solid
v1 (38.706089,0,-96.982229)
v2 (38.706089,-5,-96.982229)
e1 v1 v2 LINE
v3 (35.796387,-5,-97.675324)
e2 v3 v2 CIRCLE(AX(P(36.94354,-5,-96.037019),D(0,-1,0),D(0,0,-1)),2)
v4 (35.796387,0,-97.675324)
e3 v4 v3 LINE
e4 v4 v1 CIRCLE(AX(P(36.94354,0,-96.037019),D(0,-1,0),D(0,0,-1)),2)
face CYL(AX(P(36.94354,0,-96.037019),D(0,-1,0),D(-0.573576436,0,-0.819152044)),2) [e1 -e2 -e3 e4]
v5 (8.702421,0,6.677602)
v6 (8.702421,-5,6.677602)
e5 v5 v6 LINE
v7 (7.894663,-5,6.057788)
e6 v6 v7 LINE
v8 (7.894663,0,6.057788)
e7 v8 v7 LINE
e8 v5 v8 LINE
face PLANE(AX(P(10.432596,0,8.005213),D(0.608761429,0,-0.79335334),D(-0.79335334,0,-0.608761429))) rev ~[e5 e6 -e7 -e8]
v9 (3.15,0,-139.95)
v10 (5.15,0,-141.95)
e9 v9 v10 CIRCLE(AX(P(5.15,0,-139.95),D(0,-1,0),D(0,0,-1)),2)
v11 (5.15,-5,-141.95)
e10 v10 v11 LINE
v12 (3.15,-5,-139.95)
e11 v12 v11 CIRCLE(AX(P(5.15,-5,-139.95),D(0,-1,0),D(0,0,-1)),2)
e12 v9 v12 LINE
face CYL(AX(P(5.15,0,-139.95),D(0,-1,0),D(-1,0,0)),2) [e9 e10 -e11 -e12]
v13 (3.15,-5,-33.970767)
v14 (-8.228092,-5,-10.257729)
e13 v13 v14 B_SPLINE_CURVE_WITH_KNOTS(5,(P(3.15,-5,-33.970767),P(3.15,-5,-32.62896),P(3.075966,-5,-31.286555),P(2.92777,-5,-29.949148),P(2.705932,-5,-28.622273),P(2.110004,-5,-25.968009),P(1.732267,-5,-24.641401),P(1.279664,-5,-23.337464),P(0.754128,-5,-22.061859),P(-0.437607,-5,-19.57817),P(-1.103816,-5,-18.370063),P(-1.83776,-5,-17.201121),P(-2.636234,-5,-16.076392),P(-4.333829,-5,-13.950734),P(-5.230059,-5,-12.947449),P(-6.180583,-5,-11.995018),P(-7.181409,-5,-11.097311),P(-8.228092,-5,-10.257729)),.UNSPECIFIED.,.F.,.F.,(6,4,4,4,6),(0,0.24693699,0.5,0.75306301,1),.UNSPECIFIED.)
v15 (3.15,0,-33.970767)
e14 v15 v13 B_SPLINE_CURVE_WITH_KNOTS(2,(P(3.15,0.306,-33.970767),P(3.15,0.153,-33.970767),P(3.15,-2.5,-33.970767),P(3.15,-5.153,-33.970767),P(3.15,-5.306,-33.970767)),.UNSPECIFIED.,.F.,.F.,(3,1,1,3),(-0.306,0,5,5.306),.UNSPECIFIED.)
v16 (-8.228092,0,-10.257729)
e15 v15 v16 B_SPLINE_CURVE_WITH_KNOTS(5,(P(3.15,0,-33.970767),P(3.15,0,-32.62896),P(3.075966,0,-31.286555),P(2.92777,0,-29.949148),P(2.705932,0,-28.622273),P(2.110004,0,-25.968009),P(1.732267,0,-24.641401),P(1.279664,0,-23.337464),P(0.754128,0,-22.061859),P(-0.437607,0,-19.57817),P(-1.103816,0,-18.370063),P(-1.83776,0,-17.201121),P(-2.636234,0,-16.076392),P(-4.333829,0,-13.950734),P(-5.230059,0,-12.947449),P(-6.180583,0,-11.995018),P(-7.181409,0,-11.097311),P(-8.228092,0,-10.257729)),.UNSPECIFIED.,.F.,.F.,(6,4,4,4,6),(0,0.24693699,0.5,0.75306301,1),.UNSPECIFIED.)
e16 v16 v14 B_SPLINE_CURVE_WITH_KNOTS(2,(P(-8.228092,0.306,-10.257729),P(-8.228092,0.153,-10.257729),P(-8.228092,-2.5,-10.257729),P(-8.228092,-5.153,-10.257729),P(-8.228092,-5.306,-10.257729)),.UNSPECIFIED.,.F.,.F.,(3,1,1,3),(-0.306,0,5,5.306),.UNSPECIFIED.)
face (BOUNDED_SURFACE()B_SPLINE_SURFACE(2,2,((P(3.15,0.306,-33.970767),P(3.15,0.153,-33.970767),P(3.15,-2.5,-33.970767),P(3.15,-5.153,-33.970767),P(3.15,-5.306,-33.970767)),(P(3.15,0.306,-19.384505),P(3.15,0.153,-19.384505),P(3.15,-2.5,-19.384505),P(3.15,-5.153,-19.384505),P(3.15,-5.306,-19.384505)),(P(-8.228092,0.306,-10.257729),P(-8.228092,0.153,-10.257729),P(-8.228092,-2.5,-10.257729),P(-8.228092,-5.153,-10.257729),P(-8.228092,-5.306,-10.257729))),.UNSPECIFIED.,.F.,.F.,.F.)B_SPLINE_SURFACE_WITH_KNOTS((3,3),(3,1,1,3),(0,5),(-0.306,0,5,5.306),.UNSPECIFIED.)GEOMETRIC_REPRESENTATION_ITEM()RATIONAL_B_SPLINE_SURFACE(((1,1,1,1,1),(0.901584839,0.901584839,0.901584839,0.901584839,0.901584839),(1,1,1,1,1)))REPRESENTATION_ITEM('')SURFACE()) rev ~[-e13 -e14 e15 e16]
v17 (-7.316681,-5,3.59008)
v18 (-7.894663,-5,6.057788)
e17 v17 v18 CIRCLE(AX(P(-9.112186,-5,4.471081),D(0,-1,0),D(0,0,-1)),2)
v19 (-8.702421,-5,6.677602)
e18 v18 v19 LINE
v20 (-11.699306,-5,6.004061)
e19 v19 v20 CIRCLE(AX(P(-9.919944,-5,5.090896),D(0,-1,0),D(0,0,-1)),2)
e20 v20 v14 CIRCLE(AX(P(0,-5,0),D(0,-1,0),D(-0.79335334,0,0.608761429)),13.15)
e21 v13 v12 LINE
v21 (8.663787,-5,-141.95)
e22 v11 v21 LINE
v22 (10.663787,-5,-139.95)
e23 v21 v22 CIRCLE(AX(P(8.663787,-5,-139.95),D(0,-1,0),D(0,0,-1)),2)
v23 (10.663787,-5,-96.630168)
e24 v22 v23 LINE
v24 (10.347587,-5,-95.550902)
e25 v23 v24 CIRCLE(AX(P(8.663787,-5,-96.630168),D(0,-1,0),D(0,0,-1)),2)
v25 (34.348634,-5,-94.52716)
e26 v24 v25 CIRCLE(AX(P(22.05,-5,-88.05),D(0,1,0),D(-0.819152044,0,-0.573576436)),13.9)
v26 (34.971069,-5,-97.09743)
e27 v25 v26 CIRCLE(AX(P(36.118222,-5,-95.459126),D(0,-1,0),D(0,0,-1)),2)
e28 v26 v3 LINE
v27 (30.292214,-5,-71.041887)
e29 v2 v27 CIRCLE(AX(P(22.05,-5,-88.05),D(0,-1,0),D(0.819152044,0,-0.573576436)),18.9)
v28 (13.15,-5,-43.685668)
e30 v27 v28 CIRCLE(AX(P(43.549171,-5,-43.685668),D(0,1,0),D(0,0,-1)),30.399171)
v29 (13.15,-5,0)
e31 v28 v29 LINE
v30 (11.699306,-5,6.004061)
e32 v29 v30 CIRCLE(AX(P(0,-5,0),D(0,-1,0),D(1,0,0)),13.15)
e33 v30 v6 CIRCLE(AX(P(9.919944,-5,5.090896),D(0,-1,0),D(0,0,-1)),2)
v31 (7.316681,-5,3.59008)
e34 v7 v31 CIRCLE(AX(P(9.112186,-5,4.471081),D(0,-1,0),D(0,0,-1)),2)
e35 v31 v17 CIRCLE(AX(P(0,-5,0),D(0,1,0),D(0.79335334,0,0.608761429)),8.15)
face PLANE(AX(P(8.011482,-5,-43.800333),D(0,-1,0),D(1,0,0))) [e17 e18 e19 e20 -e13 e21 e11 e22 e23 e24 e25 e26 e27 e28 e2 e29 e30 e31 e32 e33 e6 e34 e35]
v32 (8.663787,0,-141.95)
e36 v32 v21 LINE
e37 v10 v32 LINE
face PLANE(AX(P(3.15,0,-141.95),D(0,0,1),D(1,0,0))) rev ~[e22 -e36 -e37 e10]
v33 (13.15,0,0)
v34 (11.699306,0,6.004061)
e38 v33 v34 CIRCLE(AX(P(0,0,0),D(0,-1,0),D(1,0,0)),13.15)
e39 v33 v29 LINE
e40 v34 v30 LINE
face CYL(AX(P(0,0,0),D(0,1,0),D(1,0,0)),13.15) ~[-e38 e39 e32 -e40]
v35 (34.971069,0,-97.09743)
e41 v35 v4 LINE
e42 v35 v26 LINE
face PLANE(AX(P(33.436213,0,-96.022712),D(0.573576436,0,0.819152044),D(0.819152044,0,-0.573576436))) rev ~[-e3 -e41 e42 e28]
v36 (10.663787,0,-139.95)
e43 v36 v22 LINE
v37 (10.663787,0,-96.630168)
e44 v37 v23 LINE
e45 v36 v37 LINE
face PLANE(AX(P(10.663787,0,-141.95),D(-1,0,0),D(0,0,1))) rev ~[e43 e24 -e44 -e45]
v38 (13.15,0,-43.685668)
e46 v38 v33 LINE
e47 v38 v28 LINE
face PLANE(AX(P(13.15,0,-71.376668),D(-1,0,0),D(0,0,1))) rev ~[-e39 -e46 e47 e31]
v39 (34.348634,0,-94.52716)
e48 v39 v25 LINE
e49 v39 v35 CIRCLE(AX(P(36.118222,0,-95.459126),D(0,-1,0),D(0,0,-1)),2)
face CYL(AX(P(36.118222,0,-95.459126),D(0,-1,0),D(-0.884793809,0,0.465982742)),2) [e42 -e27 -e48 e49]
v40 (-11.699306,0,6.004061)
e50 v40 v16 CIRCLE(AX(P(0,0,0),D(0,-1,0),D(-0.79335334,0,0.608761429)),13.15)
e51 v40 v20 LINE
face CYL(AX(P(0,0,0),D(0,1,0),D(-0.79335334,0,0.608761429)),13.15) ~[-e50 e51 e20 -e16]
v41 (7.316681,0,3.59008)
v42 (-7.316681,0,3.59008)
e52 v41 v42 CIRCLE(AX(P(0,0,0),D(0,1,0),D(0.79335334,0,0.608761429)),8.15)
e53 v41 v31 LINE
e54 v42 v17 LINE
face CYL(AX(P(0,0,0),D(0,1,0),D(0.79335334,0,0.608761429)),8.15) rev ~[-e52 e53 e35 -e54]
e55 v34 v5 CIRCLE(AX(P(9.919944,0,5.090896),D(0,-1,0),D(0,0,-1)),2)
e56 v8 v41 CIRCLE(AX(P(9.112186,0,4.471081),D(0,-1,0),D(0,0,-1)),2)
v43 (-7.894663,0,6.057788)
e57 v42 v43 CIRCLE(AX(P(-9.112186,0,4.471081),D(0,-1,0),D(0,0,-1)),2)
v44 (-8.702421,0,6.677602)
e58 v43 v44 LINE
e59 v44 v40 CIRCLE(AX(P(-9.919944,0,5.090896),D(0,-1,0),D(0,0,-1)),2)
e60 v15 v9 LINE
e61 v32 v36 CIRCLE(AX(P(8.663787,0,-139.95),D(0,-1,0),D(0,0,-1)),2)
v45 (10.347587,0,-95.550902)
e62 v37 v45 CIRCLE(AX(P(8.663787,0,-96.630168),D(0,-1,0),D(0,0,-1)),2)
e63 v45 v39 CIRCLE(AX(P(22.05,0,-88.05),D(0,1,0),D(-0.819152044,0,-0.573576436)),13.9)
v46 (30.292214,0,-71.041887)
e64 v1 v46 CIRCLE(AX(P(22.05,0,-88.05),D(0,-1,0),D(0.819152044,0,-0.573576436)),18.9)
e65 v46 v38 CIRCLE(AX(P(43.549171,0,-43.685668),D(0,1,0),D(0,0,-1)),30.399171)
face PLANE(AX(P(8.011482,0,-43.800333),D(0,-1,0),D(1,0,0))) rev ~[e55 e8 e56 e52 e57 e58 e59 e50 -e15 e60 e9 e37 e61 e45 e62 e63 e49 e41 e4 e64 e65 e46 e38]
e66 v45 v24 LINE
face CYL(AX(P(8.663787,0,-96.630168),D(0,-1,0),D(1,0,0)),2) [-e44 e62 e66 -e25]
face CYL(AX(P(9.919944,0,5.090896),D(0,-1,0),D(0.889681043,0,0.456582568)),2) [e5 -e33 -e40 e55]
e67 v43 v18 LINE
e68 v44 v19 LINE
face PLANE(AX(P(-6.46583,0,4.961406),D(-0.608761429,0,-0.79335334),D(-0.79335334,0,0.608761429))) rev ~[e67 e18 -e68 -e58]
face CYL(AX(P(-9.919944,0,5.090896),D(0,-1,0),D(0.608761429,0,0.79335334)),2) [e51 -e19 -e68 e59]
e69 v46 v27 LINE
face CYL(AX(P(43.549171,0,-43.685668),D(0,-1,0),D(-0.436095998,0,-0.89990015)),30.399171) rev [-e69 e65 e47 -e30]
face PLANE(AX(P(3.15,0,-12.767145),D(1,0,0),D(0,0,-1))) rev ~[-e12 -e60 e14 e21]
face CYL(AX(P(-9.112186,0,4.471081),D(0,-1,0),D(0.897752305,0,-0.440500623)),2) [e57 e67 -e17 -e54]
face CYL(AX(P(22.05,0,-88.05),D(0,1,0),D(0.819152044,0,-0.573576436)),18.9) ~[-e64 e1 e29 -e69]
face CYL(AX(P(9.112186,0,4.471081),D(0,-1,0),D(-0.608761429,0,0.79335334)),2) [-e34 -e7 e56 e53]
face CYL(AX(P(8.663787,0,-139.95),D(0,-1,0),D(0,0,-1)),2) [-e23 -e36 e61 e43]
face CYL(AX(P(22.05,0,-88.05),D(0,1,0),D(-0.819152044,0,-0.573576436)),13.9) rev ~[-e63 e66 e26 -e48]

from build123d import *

# Parameters (mm, degrees)
F1_DEPTH = 5
F2_R     = 2
F3_R     = 30.3991713246


with BuildPart() as f1:
    # F0 (on Front) → F1 (new body)
    with BuildSketch(Plane.XZ):
        with BuildLine():
            ThreePointArc((8.4325112108, -10.0903545369), (5.9438997073, -11.7299853482), (3.15, -12.7671453348))
            Line((3.15, -12.7671453348), (3.15, -88.05))
            ThreePointArc((3.15, -88.05), (3.6076950345, -83.915826859), (4.9586124402, -79.9818855189))
            ThreePointArc((4.9586124402, -79.9818855189), (8.3605698088, -75.0189025389), (13.15, -71.3766679995))
            Line((13.15, -71.3766679995), (13.15, 0))
            ThreePointArc((13.15, 0), (11.91238898, -5.569334681), (8.4325112108, -10.0903545369))
        make_face()
        with BuildLine():
            ThreePointArc((4.9586124402, -79.9818855189), (3.6076950345, -83.915826859), (3.15, -88.05))
            ThreePointArc((3.15, -88.05), (4.0247496309, -93.7333396106), (6.5680263629, -98.890594647))
            Line((6.5680263629, -98.890594647), (10.6637865844, -96.0227124653))
            ThreePointArc((10.6637865844, -96.0227124653), (22.05, -74.15), (33.4362134156, -96.0227124653))
            Line((33.4362134156, -96.0227124653), (37.5319736371, -98.890594647))
            ThreePointArc((37.5319736371, -98.890594647), (36.1951275757, -75.5150342694), (13.15, -71.3766679995))
            ThreePointArc((13.15, -71.3766679995), (8.3605698088, -75.0189025389), (4.9586124402, -79.9818855189))
        make_face()
        with BuildLine():
            ThreePointArc((6.5680263629, -98.890594647), (4.0247496309, -93.7333396106), (3.15, -88.05))
            Line((3.15, -88.05), (3.15, -141.95))
            Line((3.15, -141.95), (10.6637865844, -141.95))
            Line((10.6637865844, -141.95), (10.6637865844, -103.1352293338))
            ThreePointArc((10.6637865844, -103.1352293338), (8.4492978203, -101.1736770845), (6.5680263629, -98.890594647))
        make_face()
        with BuildLine():
            Line((10.6637865844, -96.0227124653), (6.5680263629, -98.890594647))
            ThreePointArc((6.5680263629, -98.890594647), (8.4492978203, -101.1736770845), (10.6637865844, -103.1352293338))
            Line((10.6637865844, -103.1352293338), (10.6637865844, -96.0227124653))
        make_face()
        with BuildLine():
            ThreePointArc((-10.4325964248, 8.0052127915), (-12.666067706, -3.5345761935), (-4.7800799709, -12.2504422562))
            ThreePointArc((-4.7800799709, -12.2504422562), (-0.8550062548, -13.1221745265), (3.15, -12.7671453348))
            ThreePointArc((3.15, -12.7671453348), (5.9438997073, -11.7299853482), (8.4325112108, -10.0903545369))
            ThreePointArc((8.4325112108, -10.0903545369), (11.91238898, -5.569334681), (13.15, 0))
            ThreePointArc((13.15, 0), (12.4521312029, 4.2269289687), (10.4325964248, 8.0052127915))
            Line((10.4325964248, 8.0052127915), (6.4658297234, 4.9614056464))
            ThreePointArc((6.4658297234, 4.9614056464), (0, -8.15), (-6.4658297234, 4.9614056464))
            Line((-6.4658297234, 4.9614056464), (-10.4325964248, 8.0052127915))
        make_face()
    extrude(amount=F1_DEPTH)

    # F2
    f2_edges = [f1.edges().sort_by_distance(p)[0] for p in [
        (6.46583, -2.5, 4.961406),
        (-6.46583, -2.5, 4.961406),
        (-10.432596, -2.5, 8.005213),
        (10.663787, -2.5, -96.022712),
        (33.436213, -2.5, -96.022712),
        (37.531974, -2.5, -98.890595),
        (3.15, -2.5, -141.95),
        (10.663787, -2.5, -141.95),
        (10.432596, -2.5, 8.005213),
    ]]
    fillet(f2_edges, radius=F2_R)

    # F3
    f3_edges = [f1.edges().sort_by_distance(p)[0] for p in [
        (3.15, -2.5, -12.767145),
        (13.15, -2.5, -71.376668),
    ]]
    fillet(f3_edges, radius=F3_R)


solid = f1.part
